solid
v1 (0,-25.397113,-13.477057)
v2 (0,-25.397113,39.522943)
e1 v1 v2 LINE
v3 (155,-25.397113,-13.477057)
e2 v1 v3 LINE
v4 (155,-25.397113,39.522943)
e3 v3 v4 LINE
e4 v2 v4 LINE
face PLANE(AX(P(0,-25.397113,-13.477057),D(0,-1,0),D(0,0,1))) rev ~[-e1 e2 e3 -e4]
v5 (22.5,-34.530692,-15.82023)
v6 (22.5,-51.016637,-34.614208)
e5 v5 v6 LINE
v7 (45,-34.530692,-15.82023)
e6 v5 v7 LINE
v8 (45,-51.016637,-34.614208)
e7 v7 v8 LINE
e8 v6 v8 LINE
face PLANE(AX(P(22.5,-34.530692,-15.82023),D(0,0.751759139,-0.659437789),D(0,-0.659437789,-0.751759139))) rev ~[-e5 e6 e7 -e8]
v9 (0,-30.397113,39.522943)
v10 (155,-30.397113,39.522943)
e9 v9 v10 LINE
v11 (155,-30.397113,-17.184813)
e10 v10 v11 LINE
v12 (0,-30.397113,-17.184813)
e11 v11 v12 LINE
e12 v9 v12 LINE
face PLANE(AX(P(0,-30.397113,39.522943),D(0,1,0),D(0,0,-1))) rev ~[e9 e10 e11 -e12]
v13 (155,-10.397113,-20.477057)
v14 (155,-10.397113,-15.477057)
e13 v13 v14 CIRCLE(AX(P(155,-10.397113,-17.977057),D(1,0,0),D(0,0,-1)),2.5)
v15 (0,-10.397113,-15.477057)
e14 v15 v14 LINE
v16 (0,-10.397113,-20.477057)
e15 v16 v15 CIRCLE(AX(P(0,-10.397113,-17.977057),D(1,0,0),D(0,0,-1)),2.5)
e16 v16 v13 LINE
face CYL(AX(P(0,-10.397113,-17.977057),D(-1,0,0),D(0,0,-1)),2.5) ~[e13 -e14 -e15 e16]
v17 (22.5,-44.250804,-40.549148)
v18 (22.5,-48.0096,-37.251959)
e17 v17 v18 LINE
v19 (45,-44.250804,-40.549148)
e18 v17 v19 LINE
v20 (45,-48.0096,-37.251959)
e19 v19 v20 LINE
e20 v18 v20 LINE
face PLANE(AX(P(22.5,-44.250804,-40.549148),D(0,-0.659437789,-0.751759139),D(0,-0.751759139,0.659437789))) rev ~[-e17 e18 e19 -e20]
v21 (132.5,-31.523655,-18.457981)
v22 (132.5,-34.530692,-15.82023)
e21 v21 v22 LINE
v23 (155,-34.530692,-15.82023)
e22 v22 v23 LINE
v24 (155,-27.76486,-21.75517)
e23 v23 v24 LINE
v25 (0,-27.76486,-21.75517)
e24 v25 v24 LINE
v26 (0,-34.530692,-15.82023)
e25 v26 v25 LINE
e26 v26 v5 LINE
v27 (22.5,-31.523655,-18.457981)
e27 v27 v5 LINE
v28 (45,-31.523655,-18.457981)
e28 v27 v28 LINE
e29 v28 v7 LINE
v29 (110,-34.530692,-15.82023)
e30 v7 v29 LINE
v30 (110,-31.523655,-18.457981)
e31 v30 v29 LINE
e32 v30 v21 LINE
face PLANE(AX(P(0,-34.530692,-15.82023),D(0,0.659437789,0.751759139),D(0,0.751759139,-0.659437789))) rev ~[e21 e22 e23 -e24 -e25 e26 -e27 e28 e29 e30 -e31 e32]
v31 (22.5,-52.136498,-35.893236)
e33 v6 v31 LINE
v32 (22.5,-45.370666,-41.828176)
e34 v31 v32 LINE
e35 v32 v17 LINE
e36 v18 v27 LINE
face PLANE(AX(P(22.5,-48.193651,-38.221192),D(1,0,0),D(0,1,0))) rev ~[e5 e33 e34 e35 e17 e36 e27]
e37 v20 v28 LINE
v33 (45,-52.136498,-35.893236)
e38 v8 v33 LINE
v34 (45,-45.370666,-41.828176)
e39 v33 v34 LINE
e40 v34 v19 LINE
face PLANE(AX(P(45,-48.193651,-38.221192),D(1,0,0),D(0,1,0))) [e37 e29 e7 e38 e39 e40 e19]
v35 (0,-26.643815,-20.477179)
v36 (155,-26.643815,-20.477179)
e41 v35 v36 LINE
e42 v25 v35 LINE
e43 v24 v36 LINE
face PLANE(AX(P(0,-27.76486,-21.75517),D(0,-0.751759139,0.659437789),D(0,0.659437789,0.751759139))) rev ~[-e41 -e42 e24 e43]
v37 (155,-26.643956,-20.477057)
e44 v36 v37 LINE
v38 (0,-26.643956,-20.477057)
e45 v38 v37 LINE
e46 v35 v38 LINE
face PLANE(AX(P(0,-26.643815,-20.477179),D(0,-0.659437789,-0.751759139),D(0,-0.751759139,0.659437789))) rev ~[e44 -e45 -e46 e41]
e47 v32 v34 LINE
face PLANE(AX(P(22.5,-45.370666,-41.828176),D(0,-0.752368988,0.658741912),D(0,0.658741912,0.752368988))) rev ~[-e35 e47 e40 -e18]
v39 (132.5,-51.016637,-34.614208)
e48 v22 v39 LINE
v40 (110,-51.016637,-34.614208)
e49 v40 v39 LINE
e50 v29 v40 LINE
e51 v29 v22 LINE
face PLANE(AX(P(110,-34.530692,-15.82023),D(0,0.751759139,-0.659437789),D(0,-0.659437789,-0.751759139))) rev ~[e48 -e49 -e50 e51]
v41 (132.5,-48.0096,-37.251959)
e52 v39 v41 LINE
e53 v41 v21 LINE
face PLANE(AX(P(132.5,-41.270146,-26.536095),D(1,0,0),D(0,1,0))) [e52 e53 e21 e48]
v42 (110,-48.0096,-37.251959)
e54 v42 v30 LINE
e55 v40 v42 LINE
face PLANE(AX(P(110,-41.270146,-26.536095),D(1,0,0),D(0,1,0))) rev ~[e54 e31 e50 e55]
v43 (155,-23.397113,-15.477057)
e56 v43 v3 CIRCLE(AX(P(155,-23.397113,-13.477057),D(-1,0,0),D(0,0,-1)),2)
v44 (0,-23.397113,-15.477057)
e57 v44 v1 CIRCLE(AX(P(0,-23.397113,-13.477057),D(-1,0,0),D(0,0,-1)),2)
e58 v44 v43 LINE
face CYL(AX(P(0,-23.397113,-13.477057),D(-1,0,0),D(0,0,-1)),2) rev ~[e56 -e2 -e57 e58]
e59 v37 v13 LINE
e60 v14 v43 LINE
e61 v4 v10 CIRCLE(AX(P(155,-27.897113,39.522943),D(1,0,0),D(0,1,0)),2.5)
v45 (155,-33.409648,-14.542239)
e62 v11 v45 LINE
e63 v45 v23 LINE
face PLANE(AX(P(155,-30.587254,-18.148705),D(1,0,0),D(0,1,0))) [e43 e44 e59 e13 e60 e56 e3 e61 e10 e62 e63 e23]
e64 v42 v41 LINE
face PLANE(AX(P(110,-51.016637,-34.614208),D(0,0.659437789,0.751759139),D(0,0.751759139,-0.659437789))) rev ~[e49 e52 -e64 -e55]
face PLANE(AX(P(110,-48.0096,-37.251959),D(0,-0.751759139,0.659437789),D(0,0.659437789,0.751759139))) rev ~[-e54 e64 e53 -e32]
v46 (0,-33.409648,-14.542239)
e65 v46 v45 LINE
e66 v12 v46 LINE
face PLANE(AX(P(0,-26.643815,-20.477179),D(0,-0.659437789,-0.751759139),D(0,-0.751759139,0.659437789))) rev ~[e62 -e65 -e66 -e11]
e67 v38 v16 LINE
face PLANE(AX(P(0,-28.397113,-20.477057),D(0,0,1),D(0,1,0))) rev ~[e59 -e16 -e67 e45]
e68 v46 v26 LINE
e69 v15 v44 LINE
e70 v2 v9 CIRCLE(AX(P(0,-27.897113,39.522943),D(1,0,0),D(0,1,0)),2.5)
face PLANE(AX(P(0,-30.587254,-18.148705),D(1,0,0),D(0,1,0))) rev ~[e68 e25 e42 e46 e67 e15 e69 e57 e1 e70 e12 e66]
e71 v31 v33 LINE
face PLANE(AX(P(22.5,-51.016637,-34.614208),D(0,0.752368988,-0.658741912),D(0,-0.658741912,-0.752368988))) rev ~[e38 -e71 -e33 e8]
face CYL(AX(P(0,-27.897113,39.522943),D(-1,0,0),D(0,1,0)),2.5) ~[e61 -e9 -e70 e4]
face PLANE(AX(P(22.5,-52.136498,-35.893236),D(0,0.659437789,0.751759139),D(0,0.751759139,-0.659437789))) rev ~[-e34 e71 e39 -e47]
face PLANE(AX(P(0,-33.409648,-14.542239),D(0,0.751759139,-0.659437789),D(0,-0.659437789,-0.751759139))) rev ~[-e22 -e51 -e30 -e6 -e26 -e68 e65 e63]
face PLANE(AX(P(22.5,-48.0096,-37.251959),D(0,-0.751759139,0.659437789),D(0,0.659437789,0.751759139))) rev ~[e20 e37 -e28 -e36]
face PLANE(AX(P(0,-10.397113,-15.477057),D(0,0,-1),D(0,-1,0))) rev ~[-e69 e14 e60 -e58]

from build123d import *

# Parameters (mm, degrees)
F1_DEPTH = 155
F3_DEPTH = 155
F5_START = 22.5
F5_DEPTH = 22.5
F6_START = 110
F6_DEPTH = 22.5
F8_START = 22.5
F8_DEPTH = 22.5


# Not quite as in the source:
# - a feature of the source that left no trace in its solid (it failed there, or was rolled back) is left out


with BuildPart() as f1:
    # F0 (on Right) → F1 (new body)
    with BuildSketch(Plane.YZ):
        with BuildLine():
            Line((-25.3971134126, 39.5229434967), (-30.3971134126, 39.5229434967))
            Line((-30.3971134126, 39.5229434967), (-30.3971134126, -18.4770565033))
            ThreePointArc((-30.3971134126, -18.4770565033), (-29.811326975, -19.8912700657), (-28.3971134126, -20.4770565033))
            Line((-28.3971134126, -20.4770565033), (-10.3971134126, -20.4770565033))
            Line((-10.3971134126, -20.4770565033), (-10.3971134126, -15.4770565033))
            Line((-10.3971134126, -15.4770565033), (-23.3971134126, -15.4770565033))
            ThreePointArc((-23.3971134126, -15.4770565033), (-24.811326975, -14.8912700657), (-25.3971134126, -13.4770565033))
            Line((-25.3971134126, -13.4770565033), (-25.3971134126, 39.5229434967))
        make_face()
        with BuildLine():
            ThreePointArc((-25.3971134126, 39.5229434967), (-27.8971134126, 42.0229434967), (-30.3971134126, 39.5229434967))
            Line((-30.3971134126, 39.5229434967), (-25.3971134126, 39.5229434967))
        make_face()
        with BuildLine():
            Line((-10.3971134126, -15.4770565033), (-10.3971134126, -20.4770565033))
            ThreePointArc((-10.3971134126, -20.4770565033), (-7.8971134126, -17.9770565033), (-10.3971134126, -15.4770565033))
        make_face()
    extrude(amount=F1_DEPTH)

    # F2 (on Right) → F3 (join)
    with BuildSketch(Plane.YZ):
        Polygon((-26.6438154831, -20.4771793517), (-33.4096477321, -14.5422392527), (-34.530691973, -15.8202297886), (-27.764859724, -21.7551698876), align=None)
    extrude(amount=F3_DEPTH)

    # F4 (on Right) → F5 (join)
    with BuildSketch(Plane.YZ.offset(F5_START)):
        Polygon((-31.5236554179, -18.4579809437), (-34.530691973, -15.8202297886), (-51.0166366924, -34.614208258), (-48.0096001373, -37.2519594131), align=None)
    extrude(amount=F5_DEPTH)

    # F4 (on Right) → F6 (join)
    with BuildSketch(Plane.YZ.offset(F6_START)):
        Polygon((-31.5236554179, -18.4579809437), (-34.530691973, -15.8202297886), (-51.0166366924, -34.614208258), (-48.0096001373, -37.2519594131), align=None)
    extrude(amount=F6_DEPTH)

    # F7 (on Right) → F8 (join)
    with BuildSketch(Plane.YZ.offset(F8_START)):
        Polygon((-51.0166366924, -34.614208258), (-52.136497942, -35.8932355375), (-45.370665693, -41.8281756365), (-44.2508044434, -40.549148357), align=None)
    extrude(amount=F8_DEPTH)


solid = f1.part
